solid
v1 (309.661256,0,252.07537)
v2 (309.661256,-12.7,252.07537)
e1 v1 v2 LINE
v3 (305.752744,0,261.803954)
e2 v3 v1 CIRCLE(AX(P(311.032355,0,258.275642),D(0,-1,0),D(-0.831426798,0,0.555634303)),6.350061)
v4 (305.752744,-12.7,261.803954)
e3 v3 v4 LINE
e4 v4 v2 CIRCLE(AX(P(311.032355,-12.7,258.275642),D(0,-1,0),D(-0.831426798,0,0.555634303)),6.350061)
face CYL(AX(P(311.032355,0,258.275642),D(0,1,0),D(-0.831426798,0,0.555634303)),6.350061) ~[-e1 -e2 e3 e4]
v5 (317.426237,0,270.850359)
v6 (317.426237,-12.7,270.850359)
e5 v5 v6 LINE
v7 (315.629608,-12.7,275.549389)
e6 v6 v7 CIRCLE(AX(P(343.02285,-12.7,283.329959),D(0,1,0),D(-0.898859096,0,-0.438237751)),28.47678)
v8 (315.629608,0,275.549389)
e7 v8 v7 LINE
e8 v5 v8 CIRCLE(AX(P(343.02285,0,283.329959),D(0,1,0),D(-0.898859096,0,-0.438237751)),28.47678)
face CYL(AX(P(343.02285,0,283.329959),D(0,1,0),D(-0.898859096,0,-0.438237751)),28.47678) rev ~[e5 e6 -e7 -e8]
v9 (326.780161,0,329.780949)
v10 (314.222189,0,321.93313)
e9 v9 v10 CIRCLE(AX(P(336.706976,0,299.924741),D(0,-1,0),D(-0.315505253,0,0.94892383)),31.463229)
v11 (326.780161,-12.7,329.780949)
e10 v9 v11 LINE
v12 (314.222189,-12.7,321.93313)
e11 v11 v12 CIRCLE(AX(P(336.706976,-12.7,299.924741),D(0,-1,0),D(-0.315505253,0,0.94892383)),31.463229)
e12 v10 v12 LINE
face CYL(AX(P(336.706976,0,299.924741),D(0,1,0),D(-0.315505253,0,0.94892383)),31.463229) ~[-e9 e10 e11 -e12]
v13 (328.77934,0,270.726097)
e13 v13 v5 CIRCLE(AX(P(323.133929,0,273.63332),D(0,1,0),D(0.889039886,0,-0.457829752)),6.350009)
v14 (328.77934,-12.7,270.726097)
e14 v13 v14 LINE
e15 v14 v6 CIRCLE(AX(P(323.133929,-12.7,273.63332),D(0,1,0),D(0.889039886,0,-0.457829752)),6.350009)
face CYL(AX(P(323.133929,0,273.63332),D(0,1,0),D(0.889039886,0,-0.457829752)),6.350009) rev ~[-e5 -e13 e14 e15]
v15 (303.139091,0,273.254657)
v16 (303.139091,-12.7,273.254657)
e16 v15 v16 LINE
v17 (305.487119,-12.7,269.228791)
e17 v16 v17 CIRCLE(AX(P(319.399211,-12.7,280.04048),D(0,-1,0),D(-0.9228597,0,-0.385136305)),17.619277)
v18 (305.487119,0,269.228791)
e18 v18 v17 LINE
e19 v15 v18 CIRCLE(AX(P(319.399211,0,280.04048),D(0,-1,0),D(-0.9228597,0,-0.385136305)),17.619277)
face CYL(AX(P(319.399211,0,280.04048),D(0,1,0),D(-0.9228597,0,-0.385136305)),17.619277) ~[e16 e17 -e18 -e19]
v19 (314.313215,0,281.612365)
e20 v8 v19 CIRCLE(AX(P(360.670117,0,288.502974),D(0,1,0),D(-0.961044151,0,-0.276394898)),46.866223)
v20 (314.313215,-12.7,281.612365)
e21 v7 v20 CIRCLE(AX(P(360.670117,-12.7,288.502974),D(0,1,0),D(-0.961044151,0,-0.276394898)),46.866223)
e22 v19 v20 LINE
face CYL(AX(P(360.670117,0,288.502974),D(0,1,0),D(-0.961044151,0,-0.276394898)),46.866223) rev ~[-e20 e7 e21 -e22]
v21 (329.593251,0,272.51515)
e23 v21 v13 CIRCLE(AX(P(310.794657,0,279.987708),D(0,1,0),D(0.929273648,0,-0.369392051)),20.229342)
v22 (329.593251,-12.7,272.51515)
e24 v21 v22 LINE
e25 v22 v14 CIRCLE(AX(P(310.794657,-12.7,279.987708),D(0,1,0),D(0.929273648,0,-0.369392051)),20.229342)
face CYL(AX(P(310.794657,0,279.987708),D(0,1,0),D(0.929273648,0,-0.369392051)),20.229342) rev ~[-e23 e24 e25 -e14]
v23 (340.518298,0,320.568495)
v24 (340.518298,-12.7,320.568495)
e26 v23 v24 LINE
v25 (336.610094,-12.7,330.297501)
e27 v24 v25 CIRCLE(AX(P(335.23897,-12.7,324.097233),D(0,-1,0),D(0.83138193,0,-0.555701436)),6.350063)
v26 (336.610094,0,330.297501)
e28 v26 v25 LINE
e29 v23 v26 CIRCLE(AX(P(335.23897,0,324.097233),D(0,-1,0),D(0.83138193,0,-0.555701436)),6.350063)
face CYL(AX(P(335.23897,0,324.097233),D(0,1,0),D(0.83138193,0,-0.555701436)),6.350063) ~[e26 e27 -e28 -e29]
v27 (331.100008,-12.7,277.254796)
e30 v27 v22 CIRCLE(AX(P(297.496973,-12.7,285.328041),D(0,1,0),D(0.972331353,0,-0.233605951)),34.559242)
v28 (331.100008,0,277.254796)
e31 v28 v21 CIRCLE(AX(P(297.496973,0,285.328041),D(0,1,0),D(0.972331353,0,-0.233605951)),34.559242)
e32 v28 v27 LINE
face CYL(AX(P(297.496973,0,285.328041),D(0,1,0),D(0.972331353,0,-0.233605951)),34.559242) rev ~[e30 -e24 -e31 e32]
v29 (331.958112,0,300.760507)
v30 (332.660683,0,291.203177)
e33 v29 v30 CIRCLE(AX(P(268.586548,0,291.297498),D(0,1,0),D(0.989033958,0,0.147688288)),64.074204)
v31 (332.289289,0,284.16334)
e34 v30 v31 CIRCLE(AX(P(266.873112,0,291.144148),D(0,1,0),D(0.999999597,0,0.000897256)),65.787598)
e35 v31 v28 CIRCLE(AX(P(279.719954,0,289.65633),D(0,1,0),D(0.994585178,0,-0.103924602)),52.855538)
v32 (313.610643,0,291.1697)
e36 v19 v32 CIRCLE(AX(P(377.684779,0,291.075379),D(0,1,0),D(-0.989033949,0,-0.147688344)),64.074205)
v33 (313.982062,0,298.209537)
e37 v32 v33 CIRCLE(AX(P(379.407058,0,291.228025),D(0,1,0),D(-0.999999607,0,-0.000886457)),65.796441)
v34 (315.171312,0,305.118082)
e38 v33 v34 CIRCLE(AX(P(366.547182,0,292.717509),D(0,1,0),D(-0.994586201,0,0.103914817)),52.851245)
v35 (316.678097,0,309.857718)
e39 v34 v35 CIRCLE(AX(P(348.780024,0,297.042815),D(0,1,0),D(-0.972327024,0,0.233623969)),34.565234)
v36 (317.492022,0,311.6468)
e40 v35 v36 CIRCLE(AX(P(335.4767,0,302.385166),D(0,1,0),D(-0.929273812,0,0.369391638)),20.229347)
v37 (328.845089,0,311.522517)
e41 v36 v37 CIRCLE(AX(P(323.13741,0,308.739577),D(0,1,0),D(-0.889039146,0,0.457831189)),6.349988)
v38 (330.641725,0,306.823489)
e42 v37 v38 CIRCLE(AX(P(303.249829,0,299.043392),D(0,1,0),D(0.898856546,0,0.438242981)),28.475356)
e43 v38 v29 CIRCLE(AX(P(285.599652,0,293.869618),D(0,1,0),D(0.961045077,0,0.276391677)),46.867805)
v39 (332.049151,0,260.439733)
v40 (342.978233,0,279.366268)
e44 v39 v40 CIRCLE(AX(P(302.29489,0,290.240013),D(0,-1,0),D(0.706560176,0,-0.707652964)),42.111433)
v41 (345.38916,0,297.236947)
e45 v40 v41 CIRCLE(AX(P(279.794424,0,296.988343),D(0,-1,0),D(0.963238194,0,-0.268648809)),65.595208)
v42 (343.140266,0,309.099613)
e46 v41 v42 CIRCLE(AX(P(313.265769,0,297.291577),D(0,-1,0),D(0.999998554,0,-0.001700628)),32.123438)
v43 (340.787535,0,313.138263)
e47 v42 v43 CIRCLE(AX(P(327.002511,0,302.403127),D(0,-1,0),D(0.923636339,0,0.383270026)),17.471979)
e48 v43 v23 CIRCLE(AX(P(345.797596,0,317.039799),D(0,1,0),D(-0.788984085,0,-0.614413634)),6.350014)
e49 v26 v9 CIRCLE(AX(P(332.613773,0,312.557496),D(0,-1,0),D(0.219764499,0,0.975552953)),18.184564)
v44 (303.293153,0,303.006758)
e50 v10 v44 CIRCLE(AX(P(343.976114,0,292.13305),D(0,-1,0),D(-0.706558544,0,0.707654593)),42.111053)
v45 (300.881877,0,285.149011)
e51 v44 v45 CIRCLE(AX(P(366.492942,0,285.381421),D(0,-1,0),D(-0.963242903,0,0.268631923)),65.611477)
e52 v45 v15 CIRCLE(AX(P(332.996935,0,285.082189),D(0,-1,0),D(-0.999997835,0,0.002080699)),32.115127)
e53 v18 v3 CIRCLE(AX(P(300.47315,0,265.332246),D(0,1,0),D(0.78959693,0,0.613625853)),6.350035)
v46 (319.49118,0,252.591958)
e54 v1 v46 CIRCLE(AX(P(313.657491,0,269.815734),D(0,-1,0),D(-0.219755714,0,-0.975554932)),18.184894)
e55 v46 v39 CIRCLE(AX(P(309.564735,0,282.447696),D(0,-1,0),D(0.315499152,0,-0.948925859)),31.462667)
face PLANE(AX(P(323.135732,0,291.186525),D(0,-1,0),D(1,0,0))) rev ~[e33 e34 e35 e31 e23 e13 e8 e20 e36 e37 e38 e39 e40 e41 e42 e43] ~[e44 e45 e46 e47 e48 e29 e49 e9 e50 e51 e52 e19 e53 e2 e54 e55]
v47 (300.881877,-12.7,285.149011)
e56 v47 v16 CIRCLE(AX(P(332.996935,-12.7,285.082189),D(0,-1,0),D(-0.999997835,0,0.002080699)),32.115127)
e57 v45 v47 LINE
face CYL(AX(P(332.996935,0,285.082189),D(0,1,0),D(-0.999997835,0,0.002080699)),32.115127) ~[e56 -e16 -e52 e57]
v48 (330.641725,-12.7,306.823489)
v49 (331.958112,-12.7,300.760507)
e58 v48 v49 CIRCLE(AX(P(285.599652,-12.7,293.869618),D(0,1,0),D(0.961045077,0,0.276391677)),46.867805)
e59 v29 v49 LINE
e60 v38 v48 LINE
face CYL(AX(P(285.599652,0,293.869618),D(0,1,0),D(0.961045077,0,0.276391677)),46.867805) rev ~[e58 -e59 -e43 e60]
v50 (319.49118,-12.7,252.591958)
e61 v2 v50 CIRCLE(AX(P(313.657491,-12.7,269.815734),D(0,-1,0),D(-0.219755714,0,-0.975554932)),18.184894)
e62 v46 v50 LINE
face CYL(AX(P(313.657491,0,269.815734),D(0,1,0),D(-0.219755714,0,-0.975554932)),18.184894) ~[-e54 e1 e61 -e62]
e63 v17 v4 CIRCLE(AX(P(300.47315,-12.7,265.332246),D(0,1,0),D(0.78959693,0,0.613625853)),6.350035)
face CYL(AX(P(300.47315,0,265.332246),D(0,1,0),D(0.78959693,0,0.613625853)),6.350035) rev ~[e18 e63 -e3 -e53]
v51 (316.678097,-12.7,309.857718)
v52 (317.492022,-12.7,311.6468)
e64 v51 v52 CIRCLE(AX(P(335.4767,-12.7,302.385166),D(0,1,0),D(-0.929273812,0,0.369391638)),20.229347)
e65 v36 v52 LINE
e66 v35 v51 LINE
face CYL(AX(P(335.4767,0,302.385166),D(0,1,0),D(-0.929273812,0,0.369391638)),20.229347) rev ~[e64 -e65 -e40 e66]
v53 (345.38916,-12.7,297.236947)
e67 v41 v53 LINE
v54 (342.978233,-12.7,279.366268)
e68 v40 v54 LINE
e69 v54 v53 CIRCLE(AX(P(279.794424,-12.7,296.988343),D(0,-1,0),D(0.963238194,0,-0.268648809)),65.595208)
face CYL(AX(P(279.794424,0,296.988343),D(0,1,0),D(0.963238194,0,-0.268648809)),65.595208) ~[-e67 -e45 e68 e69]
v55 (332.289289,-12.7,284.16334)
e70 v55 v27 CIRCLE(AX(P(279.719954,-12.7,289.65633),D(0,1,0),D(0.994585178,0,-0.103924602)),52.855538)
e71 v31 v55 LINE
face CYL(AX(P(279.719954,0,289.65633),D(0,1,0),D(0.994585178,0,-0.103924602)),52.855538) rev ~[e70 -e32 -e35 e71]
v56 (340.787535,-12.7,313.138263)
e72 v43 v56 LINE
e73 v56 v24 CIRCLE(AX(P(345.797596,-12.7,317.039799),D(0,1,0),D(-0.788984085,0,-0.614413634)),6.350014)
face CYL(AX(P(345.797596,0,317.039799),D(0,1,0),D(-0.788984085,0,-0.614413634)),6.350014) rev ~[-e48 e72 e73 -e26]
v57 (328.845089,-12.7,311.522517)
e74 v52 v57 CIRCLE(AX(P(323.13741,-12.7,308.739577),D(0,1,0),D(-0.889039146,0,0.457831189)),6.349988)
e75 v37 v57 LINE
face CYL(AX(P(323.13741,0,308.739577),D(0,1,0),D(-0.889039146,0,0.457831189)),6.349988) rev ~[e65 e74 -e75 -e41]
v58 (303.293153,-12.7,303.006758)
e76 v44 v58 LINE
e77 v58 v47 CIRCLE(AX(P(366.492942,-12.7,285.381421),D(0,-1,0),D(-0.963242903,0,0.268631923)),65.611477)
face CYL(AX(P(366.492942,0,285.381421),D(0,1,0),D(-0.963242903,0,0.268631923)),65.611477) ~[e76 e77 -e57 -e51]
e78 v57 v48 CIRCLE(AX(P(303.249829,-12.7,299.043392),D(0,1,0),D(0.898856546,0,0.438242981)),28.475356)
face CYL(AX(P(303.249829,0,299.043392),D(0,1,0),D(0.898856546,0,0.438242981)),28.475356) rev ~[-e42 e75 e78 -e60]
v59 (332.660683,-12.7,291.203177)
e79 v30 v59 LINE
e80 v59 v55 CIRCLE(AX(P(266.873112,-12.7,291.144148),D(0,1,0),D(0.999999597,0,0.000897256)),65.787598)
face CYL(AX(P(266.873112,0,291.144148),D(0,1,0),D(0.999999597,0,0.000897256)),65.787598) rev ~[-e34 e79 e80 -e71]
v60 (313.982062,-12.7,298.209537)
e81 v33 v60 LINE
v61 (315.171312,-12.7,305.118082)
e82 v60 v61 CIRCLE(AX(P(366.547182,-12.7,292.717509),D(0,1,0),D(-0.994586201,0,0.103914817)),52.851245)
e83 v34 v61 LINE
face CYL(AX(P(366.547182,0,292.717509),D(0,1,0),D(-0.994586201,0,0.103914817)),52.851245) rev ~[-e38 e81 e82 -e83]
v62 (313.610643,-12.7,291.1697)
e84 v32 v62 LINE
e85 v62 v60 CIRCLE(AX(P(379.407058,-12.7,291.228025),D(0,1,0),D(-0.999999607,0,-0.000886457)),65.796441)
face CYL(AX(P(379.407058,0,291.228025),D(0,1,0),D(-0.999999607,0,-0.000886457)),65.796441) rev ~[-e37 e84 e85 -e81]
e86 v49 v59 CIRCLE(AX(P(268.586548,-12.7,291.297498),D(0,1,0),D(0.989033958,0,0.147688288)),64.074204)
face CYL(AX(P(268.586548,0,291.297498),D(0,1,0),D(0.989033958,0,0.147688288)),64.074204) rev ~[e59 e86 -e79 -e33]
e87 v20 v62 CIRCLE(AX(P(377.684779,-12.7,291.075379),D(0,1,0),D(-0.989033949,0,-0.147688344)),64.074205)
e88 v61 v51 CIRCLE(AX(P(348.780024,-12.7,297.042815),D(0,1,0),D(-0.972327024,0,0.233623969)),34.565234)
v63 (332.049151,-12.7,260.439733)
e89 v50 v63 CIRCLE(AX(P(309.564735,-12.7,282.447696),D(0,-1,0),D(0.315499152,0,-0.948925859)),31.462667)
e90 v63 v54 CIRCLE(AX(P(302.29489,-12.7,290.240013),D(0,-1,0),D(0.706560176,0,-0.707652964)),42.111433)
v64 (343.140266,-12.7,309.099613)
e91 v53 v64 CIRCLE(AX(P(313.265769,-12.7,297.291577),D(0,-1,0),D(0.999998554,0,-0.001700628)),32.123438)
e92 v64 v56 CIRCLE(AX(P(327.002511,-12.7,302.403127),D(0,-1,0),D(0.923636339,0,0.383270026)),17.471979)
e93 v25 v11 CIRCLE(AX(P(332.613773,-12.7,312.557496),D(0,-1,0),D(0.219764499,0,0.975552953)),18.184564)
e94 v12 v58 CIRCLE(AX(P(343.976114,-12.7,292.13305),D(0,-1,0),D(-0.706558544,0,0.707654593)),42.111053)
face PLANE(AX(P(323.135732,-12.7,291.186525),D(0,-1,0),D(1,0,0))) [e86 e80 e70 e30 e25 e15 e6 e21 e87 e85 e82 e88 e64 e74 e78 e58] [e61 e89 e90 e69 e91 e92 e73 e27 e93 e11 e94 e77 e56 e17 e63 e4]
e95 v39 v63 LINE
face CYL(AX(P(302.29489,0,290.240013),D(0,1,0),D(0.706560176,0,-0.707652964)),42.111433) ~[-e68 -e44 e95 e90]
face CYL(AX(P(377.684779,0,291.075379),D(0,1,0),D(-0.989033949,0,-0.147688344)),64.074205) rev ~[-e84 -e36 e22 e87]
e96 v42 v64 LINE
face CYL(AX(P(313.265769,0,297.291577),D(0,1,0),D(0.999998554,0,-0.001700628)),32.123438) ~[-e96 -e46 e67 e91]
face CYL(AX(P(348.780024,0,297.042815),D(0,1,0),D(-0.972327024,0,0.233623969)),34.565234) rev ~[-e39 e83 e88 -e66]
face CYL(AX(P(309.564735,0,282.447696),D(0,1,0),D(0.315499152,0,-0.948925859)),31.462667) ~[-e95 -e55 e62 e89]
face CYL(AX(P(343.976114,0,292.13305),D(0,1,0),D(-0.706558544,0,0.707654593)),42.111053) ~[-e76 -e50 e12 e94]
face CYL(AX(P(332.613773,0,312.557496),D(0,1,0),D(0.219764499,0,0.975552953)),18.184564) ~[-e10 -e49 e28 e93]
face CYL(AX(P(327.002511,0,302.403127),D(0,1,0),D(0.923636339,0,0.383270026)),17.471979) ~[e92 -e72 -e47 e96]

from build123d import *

# Parameters (mm, degrees)
F1_DEPTH = 12.7


# Not quite as in the source:
# - ends of sketch curves that miss each other by under 0.0002 mm in the source are joined


with BuildPart() as f1:
    # F0 (on Front) → F1 (new body)
    with BuildSketch(Plane.XZ):
        with BuildLine():
            ThreePointArc((303.2931532121, 303.0067577098), (301.4715319233, 294.1610584771), (300.8818774244, 285.1490106185))
            ThreePointArc((300.8818774244, 285.1490106185), (301.4449295055, 279.0945065847), (303.1390906491, 273.2546565343))
            ThreePointArc((303.1390906491, 273.2546565343), (304.1794047627, 271.163745604), (305.4871188741, 269.2287914427))
            ThreePointArc((305.4871188741, 269.2287914427), (306.8191261994, 265.559271793), (305.752743748, 261.8039536514))
            ThreePointArc((305.752743748, 261.8039536514), (305.1400456304, 255.9083712227), (309.6612562028, 252.0753703346))
            ThreePointArc((309.6612562028, 252.0753703346), (314.6118369552, 251.6558987634), (319.4911798503, 252.5919579373))
            ThreePointArc((319.4911798503, 252.5919579373), (326.238452414, 255.7664937708), (332.0491509461, 260.4397327714))
            ThreePointArc((332.0491509461, 260.4397327714), (338.7629233679, 269.1816350422), (342.9782332171, 279.3662684747))
            ThreePointArc((342.9782332171, 279.3662684747), (344.8007217874, 288.2183656036), (345.3891604556, 297.2369467464))
            ThreePointArc((345.3891604556, 297.2369467464), (344.8270625572, 303.274887915), (343.1402655074, 309.0996131302))
            ThreePointArc((343.1402655074, 309.0996131302), (342.0995588503, 311.1979660981), (340.7875354527, 313.1382632658))
            ThreePointArc((340.7875354527, 313.1382632658), (339.4517460358, 316.8098548296), (340.5182976713, 320.568494544))
            ThreePointArc((340.5182976713, 320.568494544), (341.1313810425, 326.4642550769), (336.610094213, 330.2975007104))
            ThreePointArc((336.610094213, 330.2975007104), (331.659512348, 330.7170042507), (326.7801614181, 329.7809489664))
            ThreePointArc((326.7801614181, 329.7809489664), (320.0328916386, 326.6063773725), (314.2221892806, 321.9331298991))
            ThreePointArc((314.2221892806, 321.9331298991), (307.5084491355, 313.1913079367), (303.2931532121, 303.0067577098))
        make_face()
        with BuildLine():
            ThreePointArc((315.1713123146, 305.1180818659), (315.8393495072, 307.515035294), (316.678097317, 309.857717846))
            ThreePointArc((316.678097317, 309.857717846), (317.0633180741, 310.7621499557), (317.4920222134, 311.6467997261))
            ThreePointArc((317.4920222134, 311.6467997261), (323.2069159103, 315.0891849126), (328.8450890708, 311.5225170196))
            ThreePointArc((328.8450890708, 311.5225170196), (329.8473834441, 309.2127575845), (330.6417253346, 306.8234892773))
            ThreePointArc((330.6417253346, 306.8234892773), (331.4003540176, 303.8138045335), (331.9581118177, 300.7605072271))
            ThreePointArc((331.9581118177, 300.7605072271), (332.4883254582, 295.994995702), (332.6606828218, 291.2031767897))
            ThreePointArc((332.6606828218, 291.2031767897), (332.5693501994, 287.6782798164), (332.2892894077, 284.1633395865))
            ThreePointArc((332.2892894077, 284.1633395865), (331.8093085942, 280.6893291587), (331.1000077041, 277.2547960368))
            ThreePointArc((331.1000077041, 277.2547960368), (330.4319997673, 274.8578337912), (329.5932507917, 272.5151498081))
            ThreePointArc((329.5932507917, 272.5151498081), (329.2080362587, 271.6107324514), (328.7793397252, 270.7260967499))
            ThreePointArc((328.7793397252, 270.7260967499), (323.064427394, 267.2836913001), (317.4262371292, 270.8503593804))
            ThreePointArc((317.4262371292, 270.8503593804), (316.4239511956, 273.1601221417), (315.6296075412, 275.5493890189))
            ThreePointArc((315.6296075412, 275.5493890189), (314.8709725785, 278.5590700417), (314.3132149314, 281.612365479))
            ThreePointArc((314.3132149314, 281.612365479), (313.7830008793, 286.3778788276), (313.6106433782, 291.1696996103))
            ThreePointArc((313.6106433782, 291.1696996103), (313.7020014012, 294.6945965951), (313.9820621923, 298.2095368135))
            ThreePointArc((313.9820621923, 298.2095368135), (314.4620178297, 301.6835485419), (315.1713123146, 305.1180818659))
        make_face(mode=Mode.SUBTRACT)
    extrude(amount=F1_DEPTH)


solid = f1.part
